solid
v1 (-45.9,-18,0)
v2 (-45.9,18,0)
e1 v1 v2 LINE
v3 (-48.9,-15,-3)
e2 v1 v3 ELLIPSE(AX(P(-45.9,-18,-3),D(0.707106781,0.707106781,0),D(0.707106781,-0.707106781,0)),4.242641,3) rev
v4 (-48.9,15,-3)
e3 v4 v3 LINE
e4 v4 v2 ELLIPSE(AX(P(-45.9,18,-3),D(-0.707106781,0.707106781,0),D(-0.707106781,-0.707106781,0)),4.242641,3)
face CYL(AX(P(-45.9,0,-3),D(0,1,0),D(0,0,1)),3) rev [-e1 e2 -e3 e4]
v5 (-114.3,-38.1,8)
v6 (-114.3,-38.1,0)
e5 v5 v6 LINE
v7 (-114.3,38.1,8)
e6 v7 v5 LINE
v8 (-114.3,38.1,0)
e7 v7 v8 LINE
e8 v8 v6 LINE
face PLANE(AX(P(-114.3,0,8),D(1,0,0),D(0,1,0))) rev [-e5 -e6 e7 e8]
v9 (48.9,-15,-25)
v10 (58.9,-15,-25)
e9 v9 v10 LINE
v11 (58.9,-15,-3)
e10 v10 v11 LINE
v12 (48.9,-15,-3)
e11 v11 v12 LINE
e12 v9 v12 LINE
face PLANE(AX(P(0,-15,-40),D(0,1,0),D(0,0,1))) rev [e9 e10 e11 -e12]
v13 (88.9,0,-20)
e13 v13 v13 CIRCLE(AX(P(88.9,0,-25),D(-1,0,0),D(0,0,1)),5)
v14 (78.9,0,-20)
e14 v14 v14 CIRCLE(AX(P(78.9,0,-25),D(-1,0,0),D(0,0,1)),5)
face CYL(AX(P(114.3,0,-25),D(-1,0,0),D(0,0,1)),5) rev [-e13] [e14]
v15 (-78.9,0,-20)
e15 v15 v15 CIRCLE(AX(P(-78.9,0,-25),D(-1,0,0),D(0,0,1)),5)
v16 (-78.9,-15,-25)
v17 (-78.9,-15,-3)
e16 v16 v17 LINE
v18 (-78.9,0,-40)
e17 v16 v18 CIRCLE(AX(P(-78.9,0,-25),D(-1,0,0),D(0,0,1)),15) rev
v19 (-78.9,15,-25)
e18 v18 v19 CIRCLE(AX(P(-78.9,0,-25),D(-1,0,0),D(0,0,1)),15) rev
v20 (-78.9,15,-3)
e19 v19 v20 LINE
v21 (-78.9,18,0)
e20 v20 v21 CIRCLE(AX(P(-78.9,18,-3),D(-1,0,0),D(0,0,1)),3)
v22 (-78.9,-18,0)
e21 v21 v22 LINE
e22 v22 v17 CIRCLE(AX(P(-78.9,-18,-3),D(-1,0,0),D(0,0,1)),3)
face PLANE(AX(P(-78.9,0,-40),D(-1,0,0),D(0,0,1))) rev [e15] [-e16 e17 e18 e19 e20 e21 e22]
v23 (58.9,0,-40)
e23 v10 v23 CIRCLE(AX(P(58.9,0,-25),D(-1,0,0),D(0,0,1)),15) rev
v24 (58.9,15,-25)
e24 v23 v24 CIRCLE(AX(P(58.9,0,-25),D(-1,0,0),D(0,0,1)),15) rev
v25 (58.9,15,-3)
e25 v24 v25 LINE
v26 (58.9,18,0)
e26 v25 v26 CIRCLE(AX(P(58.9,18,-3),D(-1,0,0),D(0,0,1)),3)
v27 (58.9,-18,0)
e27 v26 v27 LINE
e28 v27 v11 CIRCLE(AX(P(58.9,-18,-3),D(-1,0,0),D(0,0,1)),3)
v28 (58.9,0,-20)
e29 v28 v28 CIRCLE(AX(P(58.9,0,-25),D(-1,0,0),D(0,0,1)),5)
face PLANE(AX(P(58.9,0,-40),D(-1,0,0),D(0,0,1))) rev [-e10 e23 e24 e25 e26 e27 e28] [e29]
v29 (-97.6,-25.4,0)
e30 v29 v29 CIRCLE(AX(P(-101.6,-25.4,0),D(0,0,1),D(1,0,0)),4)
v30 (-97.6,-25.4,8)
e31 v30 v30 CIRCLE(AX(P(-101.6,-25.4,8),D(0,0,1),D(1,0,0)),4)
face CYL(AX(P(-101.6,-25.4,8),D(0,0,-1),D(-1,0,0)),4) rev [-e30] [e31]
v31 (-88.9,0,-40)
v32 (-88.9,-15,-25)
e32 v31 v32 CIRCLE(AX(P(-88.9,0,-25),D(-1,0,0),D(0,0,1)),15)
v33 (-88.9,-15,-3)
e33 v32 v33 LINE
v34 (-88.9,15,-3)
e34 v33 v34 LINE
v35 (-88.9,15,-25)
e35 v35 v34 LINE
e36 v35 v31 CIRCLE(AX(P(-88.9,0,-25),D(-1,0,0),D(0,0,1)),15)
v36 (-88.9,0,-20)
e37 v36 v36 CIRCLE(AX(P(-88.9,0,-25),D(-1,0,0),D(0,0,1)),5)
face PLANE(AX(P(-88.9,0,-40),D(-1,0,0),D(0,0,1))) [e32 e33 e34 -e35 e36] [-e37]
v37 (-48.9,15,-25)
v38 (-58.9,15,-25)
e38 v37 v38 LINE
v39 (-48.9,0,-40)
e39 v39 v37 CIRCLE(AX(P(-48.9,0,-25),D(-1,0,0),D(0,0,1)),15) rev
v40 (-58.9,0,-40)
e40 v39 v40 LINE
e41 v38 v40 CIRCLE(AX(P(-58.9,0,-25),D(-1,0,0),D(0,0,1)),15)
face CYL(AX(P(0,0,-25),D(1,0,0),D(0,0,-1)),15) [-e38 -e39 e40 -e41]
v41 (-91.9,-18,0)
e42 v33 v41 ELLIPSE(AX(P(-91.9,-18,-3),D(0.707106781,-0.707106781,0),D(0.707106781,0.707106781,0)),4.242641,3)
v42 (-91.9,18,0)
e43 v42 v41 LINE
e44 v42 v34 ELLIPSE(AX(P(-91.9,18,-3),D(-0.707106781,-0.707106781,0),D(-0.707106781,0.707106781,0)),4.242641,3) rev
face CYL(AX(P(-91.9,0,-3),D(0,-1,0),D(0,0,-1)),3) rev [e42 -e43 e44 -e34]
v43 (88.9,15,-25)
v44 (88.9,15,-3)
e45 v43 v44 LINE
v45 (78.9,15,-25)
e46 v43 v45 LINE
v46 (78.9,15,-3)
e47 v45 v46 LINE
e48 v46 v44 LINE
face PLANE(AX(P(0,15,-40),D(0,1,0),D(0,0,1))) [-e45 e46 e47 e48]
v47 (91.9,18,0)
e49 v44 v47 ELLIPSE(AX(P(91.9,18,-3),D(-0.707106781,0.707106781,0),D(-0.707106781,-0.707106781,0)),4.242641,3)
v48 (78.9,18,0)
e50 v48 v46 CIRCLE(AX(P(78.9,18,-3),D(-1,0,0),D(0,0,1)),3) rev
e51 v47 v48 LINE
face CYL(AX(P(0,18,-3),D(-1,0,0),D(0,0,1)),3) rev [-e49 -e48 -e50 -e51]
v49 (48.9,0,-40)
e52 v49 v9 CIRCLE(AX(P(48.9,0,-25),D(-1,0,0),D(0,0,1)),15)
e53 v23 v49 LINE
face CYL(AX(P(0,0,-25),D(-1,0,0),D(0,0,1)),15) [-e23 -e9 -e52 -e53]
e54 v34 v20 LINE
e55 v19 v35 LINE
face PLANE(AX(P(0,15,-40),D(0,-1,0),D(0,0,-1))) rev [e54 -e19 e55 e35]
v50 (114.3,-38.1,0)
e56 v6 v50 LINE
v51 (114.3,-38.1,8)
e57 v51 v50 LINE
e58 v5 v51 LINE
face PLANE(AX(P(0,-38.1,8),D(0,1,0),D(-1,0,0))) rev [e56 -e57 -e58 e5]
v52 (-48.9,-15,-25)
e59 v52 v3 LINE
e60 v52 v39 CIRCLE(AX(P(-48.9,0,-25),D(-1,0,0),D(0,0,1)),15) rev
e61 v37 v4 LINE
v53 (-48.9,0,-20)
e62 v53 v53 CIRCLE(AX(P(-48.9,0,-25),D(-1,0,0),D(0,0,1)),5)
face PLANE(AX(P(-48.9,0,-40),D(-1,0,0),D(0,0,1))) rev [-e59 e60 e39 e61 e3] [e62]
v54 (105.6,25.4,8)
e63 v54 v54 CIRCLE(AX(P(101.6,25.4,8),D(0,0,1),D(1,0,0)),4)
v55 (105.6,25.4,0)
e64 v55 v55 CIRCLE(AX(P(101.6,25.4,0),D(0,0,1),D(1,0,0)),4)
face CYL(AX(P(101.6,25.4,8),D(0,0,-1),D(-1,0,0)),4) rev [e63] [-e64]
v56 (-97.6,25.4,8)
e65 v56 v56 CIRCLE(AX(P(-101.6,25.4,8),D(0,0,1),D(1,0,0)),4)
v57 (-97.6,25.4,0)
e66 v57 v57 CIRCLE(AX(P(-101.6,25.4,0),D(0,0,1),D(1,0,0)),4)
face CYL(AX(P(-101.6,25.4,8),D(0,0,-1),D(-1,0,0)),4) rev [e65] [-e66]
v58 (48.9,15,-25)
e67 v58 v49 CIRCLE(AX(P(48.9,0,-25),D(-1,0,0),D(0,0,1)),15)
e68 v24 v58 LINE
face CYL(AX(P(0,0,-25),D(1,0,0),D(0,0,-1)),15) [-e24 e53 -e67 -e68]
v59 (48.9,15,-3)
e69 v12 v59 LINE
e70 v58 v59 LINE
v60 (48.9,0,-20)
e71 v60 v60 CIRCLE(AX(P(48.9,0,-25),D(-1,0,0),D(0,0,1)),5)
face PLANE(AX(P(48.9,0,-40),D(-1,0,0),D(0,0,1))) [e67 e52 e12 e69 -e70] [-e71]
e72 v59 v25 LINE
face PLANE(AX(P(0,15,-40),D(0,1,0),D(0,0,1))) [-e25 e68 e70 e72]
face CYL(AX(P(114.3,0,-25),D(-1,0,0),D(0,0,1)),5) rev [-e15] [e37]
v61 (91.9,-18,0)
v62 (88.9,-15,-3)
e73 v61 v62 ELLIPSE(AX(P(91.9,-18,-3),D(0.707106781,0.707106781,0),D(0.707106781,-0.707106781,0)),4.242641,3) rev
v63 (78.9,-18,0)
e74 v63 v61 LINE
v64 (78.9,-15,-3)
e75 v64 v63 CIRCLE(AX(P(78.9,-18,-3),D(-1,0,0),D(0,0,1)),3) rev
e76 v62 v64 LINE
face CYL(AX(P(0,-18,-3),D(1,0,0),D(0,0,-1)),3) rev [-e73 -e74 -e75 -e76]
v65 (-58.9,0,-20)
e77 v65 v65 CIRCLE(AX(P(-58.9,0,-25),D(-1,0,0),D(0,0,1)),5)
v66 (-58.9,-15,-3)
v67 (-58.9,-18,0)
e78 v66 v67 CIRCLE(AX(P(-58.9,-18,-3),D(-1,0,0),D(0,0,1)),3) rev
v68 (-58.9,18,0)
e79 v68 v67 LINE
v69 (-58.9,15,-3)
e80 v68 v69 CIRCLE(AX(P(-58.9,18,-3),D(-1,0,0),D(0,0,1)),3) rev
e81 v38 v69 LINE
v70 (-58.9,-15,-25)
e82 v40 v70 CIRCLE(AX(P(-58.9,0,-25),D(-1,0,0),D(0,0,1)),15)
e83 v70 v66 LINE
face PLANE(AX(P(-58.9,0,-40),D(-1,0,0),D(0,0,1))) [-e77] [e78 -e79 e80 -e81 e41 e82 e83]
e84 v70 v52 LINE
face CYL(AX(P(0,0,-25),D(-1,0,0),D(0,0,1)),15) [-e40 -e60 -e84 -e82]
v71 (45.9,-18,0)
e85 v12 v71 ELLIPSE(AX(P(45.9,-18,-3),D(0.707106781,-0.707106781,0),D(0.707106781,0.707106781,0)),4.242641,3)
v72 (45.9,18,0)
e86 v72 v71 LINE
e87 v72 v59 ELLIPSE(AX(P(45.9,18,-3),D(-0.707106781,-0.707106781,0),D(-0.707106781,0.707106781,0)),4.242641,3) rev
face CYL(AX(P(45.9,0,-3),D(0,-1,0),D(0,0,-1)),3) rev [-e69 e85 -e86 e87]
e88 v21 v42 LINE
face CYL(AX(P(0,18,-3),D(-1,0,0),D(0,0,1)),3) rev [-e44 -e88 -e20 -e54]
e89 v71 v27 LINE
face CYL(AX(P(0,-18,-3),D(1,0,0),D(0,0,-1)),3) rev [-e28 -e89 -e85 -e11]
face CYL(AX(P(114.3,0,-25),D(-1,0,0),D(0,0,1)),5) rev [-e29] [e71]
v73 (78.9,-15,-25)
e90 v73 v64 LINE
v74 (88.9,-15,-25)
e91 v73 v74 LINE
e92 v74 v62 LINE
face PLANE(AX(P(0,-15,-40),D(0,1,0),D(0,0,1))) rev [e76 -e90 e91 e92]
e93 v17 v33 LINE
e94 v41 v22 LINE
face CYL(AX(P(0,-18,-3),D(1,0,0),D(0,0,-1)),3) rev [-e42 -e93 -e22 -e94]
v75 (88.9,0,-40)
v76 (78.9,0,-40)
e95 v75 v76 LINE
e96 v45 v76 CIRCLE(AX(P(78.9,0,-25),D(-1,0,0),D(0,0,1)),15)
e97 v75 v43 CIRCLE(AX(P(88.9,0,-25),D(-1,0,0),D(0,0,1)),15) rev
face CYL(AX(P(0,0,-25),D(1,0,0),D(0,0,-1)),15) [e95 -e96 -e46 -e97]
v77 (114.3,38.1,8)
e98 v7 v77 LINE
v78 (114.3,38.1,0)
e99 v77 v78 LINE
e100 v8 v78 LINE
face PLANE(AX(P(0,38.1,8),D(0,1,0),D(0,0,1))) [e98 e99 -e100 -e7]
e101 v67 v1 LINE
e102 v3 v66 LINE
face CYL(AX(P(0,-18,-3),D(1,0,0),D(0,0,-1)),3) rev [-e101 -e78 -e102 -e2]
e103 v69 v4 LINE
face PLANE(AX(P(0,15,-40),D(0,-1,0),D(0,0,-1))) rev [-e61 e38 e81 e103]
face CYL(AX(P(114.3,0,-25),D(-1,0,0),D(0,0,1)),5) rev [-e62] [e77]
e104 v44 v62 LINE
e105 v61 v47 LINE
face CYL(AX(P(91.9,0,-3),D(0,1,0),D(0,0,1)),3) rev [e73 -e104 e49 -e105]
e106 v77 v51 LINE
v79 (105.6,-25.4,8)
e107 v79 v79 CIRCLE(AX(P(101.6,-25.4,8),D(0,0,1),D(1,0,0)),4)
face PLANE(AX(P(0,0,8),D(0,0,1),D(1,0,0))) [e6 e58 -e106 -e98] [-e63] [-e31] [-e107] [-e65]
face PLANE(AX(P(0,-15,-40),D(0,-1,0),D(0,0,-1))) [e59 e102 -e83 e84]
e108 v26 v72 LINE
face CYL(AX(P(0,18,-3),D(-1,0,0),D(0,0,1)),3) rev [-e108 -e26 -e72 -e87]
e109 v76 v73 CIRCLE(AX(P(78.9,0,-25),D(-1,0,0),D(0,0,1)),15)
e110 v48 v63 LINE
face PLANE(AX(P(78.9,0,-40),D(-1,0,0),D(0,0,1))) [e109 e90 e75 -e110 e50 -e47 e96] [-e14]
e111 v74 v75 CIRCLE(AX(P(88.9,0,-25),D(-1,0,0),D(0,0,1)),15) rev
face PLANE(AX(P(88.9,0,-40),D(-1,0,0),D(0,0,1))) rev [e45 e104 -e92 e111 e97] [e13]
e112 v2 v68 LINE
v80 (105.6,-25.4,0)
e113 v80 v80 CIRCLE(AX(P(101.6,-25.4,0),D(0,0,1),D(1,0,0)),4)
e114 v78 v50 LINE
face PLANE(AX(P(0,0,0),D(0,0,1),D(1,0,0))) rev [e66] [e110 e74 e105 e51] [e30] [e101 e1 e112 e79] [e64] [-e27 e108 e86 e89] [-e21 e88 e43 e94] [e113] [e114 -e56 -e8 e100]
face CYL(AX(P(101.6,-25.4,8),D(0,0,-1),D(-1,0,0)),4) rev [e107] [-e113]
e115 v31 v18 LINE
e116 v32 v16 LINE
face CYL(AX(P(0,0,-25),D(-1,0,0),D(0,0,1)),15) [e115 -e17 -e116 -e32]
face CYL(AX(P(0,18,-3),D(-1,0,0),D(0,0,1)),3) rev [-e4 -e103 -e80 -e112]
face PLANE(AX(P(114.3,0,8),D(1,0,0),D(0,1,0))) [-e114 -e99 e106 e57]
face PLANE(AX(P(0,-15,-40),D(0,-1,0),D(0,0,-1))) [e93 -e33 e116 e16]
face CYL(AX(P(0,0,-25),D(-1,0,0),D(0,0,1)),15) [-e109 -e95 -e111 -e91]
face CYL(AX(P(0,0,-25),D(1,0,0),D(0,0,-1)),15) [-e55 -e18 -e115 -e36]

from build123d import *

# Parameters (mm, degrees)
SKETCH1_W           = 228.6
SKETCH1_H           = 76.2
SKETCH1_R           = 4
SKETCH1_W_2         = 10
SKETCH1_H_2         = 30
BOSS_EXTRUDE1_DEPTH = 8
SKETCH1_3_W         = 10
SKETCH1_3_H         = 30
BOSS_EXTRUDE2_DEPTH = 40
FILLET1_R           = 3
SKETCH2_R           = 5
CUT_EXTRUDE1_DEPTH  = 211.575046005
FILLET2_R           = 15


with BuildPart() as part:
    # Sketch1 → Boss-Extrude1 (new body)
    # profile 1 of 5: a face of its own
    with BuildSketch(Plane.XY):
        Rectangle(SKETCH1_W, SKETCH1_H)
        with Locations((-101.6, -25.4)):
            Circle(SKETCH1_R, mode=Mode.SUBTRACT)
        with Locations((101.6, -25.4)):
            Circle(SKETCH1_R, mode=Mode.SUBTRACT)
        with Locations((101.6, 25.4)):
            Circle(SKETCH1_R, mode=Mode.SUBTRACT)
        with Locations((-101.6, 25.4)):
            Circle(SKETCH1_R, mode=Mode.SUBTRACT)
        with Locations((53.9, 0)):
            Rectangle(SKETCH1_W_2, SKETCH1_H_2, mode=Mode.SUBTRACT)
        with Locations((83.9, 0)):
            Rectangle(SKETCH1_W_2, SKETCH1_H_2, mode=Mode.SUBTRACT)
        with Locations((-83.9, 0)):
            Rectangle(SKETCH1_W_2, SKETCH1_H_2, mode=Mode.SUBTRACT)
        with Locations((-53.9, 0)):
            Rectangle(SKETCH1_W_2, SKETCH1_H_2, mode=Mode.SUBTRACT)
    # profile 2 of 5: a face of its own
    with BuildSketch(Plane.XY):
        with Locations((-53.9, 0)):
            Rectangle(SKETCH1_W_2, SKETCH1_H_2)
    # profile 3 of 5: a face of its own
    with BuildSketch(Plane.XY):
        with Locations((-83.9, 0)):
            Rectangle(SKETCH1_W_2, SKETCH1_H_2)
    # profile 4 of 5: a face of its own
    with BuildSketch(Plane.XY):
        with Locations((53.9, 0)):
            Rectangle(SKETCH1_W_2, SKETCH1_H_2)
    # profile 5 of 5: a face of its own
    with BuildSketch(Plane.XY):
        with Locations((83.9, 0)):
            Rectangle(SKETCH1_W_2, SKETCH1_H_2)
    extrude(amount=BOSS_EXTRUDE1_DEPTH)

    # Sketch1<3> → Boss-Extrude2 (add)
    with BuildSketch(Plane.XY):
        with Locations((-83.9, 0)):
            Rectangle(SKETCH1_3_W, SKETCH1_3_H)
        with Locations((-53.9, 0)):
            Rectangle(SKETCH1_3_W, SKETCH1_3_H)
        with Locations((83.9, 0)):
            Rectangle(SKETCH1_3_W, SKETCH1_3_H)
        with Locations((53.9, 0)):
            Rectangle(SKETCH1_3_W, SKETCH1_3_H)
    extrude(amount=-BOSS_EXTRUDE2_DEPTH)

    # Fillet1
    fillet1_edges = [part.edges().sort_by_distance(p)[0] for p in [
        (-83.9, 15, 0),
        (-88.9, 0, 0),
        (-83.9, -15, 0),
        (-48.9, 0, 0),
        (-53.9, 15, 0),
        (-53.9, -15, 0),
        (88.9, 0, 0),
        (83.9, -15, 0),
        (83.9, 15, 0),
        (53.9, -15, 0),
        (53.9, 15, 0),
        (48.9, 0, 0),
    ]]
    fillet(fillet1_edges, radius=FILLET1_R)

    # Sketch2 → Cut-Extrude1 (cut, through all)
    with BuildSketch(Plane.ZY.offset(88.9)):
        with Locations((-25, 0)):
            Circle(SKETCH2_R)
    extrude(amount=-CUT_EXTRUDE1_DEPTH, mode=Mode.SUBTRACT)

    # Fillet2
    fillet2_edges = [part.edges().sort_by_distance(p)[0] for p in [
        (53.9, 15, -40),
        (53.9, -15, -40),
        (83.9, 15, -40),
        (83.9, -15, -40),
        (-53.9, 15, -40),
        (-53.9, -15, -40),
        (-83.9, -15, -40),
        (-83.9, 15, -40),
    ]]
    fillet(fillet2_edges, radius=FILLET2_R - 0.0001)  # a hair under: the kernel refuses the full size


solid = part.part
